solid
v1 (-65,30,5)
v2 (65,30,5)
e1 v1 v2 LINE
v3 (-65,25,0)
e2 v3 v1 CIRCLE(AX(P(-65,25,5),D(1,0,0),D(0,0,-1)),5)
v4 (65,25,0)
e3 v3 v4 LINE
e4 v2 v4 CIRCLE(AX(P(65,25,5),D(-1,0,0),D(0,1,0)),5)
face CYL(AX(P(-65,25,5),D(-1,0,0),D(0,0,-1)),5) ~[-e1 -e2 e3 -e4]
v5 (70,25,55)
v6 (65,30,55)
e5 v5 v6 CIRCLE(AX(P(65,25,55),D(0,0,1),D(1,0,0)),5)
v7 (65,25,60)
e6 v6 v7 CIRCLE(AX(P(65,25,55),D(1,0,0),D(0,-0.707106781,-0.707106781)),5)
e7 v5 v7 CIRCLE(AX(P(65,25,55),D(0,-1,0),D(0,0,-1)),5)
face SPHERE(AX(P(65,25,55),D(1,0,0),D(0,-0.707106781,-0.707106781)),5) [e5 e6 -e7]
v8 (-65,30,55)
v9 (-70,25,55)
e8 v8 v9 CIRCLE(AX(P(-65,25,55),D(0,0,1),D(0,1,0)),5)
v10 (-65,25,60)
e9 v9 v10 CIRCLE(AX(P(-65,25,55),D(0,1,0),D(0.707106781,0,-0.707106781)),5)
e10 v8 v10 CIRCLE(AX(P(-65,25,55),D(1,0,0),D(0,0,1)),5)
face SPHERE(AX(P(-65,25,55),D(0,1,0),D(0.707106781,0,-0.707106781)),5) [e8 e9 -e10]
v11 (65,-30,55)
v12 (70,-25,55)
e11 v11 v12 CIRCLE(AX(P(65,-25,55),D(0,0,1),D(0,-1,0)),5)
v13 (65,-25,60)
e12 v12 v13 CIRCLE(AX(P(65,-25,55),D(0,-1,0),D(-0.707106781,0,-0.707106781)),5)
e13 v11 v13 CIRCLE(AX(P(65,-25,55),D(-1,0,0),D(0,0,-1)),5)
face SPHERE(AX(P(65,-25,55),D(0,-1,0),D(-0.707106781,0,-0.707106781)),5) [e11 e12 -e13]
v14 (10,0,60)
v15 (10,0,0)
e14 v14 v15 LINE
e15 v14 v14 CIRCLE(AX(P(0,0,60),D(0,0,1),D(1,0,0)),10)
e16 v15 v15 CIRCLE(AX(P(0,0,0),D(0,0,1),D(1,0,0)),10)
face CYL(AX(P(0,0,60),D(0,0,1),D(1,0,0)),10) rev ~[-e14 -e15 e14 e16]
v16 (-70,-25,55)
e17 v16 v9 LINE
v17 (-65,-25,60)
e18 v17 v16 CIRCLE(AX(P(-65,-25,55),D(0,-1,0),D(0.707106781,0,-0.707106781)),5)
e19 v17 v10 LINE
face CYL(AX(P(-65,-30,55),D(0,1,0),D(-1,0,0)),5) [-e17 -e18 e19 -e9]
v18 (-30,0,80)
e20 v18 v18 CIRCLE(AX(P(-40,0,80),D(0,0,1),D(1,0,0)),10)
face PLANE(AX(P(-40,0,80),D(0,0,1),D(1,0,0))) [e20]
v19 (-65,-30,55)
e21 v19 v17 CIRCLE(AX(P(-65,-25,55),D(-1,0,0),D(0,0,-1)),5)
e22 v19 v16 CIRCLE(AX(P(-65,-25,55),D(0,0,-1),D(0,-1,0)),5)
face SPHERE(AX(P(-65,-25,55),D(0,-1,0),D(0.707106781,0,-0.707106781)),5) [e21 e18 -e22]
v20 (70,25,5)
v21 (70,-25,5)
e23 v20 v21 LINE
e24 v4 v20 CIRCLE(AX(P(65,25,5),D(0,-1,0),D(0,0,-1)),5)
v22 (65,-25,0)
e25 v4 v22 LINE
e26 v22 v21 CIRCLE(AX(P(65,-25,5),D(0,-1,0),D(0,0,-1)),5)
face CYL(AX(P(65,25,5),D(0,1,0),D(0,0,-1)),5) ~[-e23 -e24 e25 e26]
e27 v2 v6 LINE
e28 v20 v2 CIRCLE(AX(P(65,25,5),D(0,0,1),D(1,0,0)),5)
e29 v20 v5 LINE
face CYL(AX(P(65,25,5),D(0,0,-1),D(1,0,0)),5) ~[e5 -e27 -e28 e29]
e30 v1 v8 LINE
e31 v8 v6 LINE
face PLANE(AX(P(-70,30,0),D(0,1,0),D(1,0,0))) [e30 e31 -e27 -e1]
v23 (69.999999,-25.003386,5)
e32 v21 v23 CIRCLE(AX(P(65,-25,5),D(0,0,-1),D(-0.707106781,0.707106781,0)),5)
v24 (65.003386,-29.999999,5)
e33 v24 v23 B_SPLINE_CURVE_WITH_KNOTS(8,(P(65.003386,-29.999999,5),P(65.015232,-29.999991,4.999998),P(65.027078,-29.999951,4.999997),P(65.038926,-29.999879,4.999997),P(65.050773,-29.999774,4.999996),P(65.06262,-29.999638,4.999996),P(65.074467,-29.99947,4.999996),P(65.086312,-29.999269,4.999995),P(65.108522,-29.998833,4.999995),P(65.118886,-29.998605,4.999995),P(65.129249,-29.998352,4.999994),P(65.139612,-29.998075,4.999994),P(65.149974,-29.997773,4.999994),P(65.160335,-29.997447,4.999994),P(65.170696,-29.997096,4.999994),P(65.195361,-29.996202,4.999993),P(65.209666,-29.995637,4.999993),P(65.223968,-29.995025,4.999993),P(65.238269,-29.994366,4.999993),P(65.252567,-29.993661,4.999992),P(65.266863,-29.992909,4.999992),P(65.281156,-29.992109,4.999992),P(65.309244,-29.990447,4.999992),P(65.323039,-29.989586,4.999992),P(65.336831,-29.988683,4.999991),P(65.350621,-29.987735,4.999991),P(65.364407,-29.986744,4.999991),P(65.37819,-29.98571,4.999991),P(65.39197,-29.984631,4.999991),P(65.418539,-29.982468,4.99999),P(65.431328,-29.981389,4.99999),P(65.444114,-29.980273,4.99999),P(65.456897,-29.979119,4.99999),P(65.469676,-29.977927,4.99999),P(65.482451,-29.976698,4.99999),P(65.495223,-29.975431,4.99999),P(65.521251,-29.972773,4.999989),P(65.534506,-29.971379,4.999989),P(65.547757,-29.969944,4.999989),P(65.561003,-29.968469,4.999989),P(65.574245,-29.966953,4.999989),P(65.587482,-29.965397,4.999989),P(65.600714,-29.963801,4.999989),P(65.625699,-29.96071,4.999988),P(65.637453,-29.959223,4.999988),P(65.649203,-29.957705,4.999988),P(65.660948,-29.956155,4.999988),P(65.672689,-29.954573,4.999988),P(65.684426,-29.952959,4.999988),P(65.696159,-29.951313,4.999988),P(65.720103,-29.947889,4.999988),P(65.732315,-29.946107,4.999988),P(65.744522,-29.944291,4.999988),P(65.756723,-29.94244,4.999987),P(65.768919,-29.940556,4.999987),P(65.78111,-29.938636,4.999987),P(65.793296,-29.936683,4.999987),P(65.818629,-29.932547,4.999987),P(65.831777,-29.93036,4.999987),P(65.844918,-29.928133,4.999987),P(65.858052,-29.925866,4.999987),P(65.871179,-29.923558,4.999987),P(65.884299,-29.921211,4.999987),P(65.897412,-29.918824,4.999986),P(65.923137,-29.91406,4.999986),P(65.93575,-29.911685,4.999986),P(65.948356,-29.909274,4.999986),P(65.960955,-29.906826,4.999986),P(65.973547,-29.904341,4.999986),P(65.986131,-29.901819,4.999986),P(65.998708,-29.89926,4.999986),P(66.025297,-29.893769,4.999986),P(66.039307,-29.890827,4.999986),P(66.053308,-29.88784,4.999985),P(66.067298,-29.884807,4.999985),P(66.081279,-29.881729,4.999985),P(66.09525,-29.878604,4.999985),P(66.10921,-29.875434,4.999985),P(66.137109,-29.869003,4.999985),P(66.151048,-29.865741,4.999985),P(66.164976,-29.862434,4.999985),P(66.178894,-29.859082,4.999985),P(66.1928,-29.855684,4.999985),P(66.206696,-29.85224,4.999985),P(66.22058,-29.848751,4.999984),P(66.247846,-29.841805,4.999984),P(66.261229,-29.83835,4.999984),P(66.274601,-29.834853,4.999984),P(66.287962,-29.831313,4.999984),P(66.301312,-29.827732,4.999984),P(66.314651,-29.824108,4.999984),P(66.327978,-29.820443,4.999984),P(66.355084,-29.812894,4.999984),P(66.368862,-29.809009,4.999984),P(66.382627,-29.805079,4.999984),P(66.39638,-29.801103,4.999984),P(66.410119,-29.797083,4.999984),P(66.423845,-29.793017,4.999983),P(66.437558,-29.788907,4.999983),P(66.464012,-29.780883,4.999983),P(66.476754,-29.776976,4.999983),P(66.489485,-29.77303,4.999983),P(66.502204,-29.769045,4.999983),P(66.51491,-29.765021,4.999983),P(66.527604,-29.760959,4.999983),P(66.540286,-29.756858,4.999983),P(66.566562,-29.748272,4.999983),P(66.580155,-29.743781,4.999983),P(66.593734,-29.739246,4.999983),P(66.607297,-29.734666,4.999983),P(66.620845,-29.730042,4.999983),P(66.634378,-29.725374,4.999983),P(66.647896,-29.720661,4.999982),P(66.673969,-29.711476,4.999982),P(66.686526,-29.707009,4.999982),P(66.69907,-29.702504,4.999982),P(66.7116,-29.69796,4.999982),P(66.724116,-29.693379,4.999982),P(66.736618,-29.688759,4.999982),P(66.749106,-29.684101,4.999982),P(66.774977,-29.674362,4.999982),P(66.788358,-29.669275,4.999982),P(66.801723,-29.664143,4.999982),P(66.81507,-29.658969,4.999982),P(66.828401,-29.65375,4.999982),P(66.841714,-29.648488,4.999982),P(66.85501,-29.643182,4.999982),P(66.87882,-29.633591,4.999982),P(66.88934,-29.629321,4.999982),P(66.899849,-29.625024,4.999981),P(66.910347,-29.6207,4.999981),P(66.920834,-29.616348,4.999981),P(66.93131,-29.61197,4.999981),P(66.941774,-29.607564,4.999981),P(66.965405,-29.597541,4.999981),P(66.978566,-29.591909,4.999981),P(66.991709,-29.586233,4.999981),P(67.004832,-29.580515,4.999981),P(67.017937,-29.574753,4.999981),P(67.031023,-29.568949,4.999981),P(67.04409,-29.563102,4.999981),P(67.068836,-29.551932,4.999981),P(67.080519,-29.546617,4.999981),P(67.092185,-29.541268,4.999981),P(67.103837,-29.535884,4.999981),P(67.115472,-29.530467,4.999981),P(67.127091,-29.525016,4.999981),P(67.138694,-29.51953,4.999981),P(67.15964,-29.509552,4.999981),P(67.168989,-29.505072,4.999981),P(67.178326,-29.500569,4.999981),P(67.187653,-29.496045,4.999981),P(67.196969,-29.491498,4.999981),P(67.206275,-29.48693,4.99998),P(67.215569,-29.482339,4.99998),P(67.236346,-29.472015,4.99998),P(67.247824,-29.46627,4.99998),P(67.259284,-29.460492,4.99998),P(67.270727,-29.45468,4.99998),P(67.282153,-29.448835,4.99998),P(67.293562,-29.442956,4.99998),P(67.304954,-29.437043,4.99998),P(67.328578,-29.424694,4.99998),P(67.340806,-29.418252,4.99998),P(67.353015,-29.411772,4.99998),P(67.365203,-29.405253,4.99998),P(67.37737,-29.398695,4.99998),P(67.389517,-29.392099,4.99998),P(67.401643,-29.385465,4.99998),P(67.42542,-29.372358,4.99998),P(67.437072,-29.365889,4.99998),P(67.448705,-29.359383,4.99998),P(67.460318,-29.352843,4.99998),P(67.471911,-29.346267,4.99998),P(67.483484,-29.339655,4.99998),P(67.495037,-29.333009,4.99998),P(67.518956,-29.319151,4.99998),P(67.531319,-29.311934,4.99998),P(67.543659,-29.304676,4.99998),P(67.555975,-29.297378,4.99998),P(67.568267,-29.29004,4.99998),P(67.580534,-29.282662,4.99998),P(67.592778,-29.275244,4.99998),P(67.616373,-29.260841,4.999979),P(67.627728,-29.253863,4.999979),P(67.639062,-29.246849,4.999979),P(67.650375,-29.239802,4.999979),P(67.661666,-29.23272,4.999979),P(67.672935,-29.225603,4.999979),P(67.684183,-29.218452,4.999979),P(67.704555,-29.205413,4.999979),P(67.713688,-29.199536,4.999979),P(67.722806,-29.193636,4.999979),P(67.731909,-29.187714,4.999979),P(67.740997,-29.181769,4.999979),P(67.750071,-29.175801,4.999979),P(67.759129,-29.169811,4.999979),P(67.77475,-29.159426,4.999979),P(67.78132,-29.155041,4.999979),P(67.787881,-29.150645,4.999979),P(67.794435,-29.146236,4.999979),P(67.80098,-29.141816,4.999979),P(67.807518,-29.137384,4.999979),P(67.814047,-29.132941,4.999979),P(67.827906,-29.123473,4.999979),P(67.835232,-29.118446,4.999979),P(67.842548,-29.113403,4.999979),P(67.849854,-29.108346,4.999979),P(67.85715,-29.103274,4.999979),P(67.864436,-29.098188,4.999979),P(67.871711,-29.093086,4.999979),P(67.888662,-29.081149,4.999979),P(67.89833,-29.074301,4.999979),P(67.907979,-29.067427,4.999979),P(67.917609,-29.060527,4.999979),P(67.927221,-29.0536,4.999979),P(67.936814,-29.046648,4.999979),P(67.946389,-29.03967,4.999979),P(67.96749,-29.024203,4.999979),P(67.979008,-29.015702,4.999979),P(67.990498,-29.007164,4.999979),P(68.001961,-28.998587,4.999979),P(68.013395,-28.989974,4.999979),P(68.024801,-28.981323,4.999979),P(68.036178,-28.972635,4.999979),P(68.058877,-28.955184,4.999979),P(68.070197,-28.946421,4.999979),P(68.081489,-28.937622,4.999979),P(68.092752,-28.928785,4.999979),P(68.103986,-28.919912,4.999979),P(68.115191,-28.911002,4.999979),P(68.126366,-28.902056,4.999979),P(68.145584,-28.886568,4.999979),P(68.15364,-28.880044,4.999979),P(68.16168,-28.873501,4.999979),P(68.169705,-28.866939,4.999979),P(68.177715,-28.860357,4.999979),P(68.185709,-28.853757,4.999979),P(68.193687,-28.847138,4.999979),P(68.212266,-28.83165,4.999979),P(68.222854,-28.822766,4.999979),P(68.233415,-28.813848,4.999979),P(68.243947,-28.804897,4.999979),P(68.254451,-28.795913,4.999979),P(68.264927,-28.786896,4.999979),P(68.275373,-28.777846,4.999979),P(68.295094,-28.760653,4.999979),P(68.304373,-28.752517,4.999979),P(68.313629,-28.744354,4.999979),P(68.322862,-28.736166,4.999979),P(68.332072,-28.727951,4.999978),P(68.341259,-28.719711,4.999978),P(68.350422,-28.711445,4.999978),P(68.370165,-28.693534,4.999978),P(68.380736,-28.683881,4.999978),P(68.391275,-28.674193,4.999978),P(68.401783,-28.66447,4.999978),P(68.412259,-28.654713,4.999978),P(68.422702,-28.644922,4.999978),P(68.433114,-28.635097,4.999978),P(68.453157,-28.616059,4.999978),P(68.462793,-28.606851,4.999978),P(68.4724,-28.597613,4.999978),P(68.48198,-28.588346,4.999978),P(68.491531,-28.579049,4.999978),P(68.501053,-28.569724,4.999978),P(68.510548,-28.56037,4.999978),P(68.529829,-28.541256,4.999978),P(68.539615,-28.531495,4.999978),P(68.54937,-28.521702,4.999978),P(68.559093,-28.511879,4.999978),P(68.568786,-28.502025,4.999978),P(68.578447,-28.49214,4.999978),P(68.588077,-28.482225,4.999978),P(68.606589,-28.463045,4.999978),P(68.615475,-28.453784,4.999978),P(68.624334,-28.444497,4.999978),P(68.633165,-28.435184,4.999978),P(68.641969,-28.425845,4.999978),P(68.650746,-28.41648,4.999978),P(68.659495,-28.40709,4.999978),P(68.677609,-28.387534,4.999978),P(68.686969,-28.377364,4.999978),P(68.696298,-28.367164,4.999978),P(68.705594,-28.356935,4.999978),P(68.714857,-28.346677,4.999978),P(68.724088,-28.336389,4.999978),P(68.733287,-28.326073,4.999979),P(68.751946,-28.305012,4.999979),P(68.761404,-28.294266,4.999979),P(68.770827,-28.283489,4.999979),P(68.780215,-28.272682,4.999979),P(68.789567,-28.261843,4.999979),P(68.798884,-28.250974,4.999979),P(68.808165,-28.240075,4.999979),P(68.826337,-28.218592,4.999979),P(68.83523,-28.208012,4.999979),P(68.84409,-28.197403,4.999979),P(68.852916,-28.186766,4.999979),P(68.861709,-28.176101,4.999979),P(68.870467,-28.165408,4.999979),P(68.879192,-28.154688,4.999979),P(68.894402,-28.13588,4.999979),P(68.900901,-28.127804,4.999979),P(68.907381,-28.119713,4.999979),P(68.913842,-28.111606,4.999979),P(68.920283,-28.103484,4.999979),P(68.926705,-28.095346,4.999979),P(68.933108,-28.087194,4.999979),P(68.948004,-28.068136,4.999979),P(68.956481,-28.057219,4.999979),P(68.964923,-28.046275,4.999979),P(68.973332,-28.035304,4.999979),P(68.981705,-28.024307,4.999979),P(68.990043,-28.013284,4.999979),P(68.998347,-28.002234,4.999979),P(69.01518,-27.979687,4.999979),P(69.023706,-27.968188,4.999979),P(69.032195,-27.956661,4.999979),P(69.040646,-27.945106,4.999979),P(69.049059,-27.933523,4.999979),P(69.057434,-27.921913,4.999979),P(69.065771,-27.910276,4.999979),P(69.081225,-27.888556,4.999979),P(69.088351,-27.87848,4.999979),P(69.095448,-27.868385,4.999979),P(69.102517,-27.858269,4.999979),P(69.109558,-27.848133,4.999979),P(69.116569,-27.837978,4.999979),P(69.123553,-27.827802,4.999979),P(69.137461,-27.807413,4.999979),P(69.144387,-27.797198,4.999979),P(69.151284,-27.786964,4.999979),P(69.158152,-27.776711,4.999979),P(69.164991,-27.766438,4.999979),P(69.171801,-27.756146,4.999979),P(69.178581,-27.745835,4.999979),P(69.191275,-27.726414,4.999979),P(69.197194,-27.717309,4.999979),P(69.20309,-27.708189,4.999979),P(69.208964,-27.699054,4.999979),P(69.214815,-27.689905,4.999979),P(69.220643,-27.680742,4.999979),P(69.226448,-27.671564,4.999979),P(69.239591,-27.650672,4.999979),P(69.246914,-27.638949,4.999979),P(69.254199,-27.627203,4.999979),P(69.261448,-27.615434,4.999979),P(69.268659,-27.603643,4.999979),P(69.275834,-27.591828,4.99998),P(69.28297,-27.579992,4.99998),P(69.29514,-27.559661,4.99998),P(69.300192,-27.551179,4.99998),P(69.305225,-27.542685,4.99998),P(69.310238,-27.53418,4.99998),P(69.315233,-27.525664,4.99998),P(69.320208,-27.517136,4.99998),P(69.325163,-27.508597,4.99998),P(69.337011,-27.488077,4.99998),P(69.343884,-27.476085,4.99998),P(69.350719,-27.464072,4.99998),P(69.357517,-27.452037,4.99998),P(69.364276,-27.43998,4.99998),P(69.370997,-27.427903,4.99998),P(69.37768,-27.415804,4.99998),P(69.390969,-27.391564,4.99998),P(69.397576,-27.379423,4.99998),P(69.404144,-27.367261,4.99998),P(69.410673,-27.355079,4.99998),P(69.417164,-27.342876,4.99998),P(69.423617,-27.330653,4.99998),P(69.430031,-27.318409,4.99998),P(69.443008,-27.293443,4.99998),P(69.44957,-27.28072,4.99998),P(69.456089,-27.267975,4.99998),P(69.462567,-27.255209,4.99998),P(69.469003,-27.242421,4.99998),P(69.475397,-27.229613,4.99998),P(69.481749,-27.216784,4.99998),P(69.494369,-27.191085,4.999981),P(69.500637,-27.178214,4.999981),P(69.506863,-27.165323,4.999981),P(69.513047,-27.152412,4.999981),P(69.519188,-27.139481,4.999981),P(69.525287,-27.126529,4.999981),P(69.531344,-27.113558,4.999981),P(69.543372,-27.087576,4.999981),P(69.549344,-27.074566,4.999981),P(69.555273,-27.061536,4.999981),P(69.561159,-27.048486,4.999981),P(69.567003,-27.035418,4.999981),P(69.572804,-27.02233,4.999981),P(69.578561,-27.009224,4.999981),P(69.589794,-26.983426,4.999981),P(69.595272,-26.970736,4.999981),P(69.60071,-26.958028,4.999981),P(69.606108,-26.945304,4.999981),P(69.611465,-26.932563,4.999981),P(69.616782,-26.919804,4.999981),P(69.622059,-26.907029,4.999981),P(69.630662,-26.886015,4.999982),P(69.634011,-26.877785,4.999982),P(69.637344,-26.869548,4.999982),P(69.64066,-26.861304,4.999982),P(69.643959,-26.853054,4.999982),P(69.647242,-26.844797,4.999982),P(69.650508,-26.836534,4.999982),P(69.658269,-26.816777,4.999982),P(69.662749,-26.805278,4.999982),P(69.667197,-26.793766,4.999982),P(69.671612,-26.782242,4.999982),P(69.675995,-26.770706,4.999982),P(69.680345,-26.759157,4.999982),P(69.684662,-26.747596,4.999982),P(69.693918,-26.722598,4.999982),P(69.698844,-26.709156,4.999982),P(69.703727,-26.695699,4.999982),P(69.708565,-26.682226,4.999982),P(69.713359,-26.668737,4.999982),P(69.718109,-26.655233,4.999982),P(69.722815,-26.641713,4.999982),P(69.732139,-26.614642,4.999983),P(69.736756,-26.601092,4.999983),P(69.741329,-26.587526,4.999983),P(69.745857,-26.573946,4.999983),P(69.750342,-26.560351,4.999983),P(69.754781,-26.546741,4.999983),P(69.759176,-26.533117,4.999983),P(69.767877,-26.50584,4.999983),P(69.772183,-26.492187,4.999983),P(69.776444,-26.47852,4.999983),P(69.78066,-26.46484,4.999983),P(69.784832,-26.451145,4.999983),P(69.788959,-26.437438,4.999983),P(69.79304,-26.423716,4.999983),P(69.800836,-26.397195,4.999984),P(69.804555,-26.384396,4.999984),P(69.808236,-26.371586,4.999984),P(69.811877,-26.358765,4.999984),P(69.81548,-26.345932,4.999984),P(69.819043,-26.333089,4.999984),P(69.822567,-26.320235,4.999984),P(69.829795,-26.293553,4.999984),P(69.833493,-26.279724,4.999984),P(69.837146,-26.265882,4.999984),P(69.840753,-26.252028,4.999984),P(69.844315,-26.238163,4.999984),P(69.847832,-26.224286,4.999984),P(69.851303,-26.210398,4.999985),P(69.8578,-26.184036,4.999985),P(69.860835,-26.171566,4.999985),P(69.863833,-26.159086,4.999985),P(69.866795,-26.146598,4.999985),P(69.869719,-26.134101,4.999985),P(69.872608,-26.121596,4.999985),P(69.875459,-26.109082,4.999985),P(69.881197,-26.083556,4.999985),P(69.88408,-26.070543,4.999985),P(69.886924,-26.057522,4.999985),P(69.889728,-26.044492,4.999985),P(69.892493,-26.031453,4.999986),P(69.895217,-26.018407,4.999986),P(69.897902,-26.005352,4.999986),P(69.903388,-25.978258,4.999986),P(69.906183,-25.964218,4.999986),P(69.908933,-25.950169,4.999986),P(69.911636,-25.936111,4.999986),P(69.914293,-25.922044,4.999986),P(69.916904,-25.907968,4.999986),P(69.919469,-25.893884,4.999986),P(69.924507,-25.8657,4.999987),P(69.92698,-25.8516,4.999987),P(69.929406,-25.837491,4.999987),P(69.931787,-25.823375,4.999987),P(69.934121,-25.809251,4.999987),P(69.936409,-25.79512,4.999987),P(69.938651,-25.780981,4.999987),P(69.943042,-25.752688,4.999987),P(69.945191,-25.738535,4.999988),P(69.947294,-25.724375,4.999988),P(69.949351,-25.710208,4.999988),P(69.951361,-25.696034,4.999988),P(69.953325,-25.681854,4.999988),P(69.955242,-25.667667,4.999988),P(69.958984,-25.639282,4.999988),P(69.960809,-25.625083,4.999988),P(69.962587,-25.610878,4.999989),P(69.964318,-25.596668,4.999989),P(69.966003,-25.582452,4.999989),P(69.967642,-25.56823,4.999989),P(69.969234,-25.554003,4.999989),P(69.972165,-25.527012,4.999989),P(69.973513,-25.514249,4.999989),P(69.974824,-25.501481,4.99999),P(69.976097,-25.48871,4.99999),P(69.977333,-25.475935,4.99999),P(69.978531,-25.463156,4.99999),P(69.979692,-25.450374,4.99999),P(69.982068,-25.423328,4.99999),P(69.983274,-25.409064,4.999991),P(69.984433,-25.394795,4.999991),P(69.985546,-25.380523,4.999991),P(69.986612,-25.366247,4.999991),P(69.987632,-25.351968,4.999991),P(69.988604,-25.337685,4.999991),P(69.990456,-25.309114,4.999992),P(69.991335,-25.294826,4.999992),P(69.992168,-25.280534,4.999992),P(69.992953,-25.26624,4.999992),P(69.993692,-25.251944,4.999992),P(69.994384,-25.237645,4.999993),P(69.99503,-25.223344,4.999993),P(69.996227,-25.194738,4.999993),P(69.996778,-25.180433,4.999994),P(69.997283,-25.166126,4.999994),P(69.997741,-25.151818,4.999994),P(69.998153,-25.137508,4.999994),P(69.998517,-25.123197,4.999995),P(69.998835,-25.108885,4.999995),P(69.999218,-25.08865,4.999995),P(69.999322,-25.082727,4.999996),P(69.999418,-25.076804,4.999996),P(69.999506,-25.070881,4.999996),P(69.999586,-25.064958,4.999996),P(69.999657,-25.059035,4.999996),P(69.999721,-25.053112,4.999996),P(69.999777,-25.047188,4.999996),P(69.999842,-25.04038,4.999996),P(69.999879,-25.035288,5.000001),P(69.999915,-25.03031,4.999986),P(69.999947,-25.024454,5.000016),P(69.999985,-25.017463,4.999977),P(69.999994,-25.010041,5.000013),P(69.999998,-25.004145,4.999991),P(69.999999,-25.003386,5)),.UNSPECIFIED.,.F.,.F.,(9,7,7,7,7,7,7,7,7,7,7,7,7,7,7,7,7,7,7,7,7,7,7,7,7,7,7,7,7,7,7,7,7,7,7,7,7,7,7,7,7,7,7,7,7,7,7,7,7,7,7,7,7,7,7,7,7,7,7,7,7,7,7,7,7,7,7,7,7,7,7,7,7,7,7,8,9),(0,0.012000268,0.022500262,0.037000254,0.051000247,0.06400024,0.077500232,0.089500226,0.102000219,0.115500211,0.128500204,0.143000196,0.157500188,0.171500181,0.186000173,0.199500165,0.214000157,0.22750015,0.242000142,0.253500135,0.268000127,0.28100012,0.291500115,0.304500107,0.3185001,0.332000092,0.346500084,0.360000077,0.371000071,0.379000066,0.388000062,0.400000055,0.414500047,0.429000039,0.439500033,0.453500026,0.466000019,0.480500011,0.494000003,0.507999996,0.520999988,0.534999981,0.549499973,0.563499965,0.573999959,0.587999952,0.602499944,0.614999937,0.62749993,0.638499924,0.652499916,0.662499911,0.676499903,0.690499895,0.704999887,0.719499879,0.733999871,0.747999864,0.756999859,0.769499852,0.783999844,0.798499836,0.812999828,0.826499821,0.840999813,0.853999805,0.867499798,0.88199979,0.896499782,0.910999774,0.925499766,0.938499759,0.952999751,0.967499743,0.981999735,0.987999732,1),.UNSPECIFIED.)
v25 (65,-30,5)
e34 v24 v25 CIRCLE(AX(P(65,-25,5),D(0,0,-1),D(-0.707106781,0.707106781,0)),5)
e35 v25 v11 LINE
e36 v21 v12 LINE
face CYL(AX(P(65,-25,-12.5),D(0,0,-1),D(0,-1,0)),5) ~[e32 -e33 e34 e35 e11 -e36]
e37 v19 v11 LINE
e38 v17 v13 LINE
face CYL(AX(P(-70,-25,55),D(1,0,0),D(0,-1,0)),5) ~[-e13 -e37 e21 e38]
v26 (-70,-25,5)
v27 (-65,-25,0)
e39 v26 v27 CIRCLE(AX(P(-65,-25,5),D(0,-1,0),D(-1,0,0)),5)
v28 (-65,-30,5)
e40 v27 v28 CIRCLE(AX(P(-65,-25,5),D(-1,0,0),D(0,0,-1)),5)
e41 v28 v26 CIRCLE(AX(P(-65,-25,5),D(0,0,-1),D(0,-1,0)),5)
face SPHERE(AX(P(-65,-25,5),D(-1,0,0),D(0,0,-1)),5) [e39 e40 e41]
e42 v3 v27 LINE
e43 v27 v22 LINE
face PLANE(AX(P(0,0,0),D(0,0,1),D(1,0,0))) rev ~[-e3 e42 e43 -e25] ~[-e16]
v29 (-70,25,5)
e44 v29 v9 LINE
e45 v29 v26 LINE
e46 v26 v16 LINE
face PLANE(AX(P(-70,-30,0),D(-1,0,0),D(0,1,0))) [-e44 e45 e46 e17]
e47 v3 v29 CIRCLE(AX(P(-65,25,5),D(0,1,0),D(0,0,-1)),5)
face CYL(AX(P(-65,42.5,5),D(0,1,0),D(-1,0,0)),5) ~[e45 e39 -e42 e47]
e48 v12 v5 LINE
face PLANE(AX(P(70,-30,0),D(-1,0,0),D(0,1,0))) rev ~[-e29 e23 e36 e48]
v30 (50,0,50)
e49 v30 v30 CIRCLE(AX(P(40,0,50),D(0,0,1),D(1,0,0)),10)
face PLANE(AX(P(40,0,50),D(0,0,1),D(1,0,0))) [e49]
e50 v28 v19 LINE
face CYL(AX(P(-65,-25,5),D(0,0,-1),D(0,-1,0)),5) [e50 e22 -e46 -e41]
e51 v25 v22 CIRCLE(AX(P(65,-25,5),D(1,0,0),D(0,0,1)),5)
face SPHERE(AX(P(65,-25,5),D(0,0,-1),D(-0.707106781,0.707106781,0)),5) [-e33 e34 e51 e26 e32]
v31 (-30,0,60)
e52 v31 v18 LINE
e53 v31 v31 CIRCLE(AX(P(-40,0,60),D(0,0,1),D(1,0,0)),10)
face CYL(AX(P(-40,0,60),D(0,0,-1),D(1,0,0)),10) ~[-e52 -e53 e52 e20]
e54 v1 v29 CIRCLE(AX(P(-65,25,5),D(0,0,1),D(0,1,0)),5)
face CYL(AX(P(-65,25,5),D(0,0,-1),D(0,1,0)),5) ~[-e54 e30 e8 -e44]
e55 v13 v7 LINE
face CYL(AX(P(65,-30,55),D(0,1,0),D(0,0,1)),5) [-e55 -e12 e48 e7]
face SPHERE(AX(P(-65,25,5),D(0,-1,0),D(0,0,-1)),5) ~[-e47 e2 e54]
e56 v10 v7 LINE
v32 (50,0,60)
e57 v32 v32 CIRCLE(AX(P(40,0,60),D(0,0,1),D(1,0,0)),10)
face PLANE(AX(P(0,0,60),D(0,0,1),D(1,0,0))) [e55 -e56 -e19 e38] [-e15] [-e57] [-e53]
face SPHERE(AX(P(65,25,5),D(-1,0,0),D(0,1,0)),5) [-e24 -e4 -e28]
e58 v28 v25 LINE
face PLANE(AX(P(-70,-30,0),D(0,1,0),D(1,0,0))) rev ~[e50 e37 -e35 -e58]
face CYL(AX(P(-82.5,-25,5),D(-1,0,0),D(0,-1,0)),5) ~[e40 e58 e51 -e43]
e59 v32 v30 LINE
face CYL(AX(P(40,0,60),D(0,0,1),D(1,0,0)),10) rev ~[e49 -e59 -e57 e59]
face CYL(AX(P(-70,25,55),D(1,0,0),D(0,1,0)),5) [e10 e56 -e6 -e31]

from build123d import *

# Parameters (mm, degrees)
F0_W          = 140
F0_H          = 60
F1_DEPTH      = 60
F2_R          = 10
F5_DEPTH      = 20
F4_R          = 10
F6_DEPTH      = 71.6
F3_R          = 10
F7_DEPTH      = 10
F8_R          = 5
F9_T1_DEPTH   = 165
F9_T3_DEPTH   = 67.5
F9_S7_W       = 5
F9_S7_H       = 5
F9_T8_DEPTH   = 5
F10_T1_DEPTH  = 50
F10_T3_DEPTH  = 67.5
F10_S7_W      = 5
F10_S7_H      = 5
F10_T8_DEPTH  = 5
F10_T12_ANGLE = 89.9999999974
F11_T1_DEPTH  = 147.5
F11_T3_DEPTH  = 50
F11_S7_W      = 5
F11_S7_H      = 5
F11_T8_DEPTH  = 5
F11_T12_ANGLE = 89.9999999974
F12_T1_DEPTH  = 50
F12_T3_DEPTH  = 50
F12_S7_W      = 5
F12_S7_H      = 5
F12_T8_DEPTH  = 5
F12_S13_W     = 5
F12_S13_H     = 5
F12_T14_DEPTH = 5
F12_T18_ANGLE = 89.9999999974


# Not quite as in the source:
# - a fillet or chamfer that OpenCascade refuses, or shapes differently, is made with other operations: its cross-section is extruded or revolved along the edge and cut away or added


with BuildPart() as f1:
    # F0 (on Top) → F1 (new body)
    with BuildSketch(Plane.XY):
        Rectangle(F0_W, F0_H)
    extrude(amount=F1_DEPTH)

    # F2 (on face) → F5 (join)
    with BuildSketch(Plane.XY.offset(60)):
        with Locations((-40, 0)):
            Circle(F2_R)
    extrude(amount=F5_DEPTH)

    # F4 (on face) → F6 (cut)
    with BuildSketch(Plane.XY.offset(60)):
        Circle(F4_R)
    extrude(amount=-F6_DEPTH, mode=Mode.SUBTRACT)

    # F3 (on face) → F7 (cut)
    with BuildSketch(Plane.XY.offset(60)):
        with Locations((40, 0)):
            Circle(F3_R)
    extrude(amount=-F7_DEPTH, mode=Mode.SUBTRACT)

    # F8
    f8_edges = [f1.edges().sort_by_distance(p)[0] for p in [
        (0, 30, 60),
        (-70, 0, 60),
        (0, -30, 60),
        (70, 0, 60),
    ]]
    fillet(f8_edges, radius=F8_R)

    # F9: fillet of radius 5 on 2 edges, made by hand

    # F9_s2 → F9_t1 (cut)
    with BuildSketch(Plane.YZ.offset(-82.5)):
        with BuildLine():
            ThreePointArc((-30, 5), (-28.5355339059, 1.4644660941), (-25, 0))
            Line((-25, 0), (-30, 0))
            Line((-30, 0), (-30, 5))
        make_face()
    extrude(amount=F9_T1_DEPTH, mode=Mode.SUBTRACT)

    # F9_s4 → F9_t3 (cut)
    with BuildSketch(Plane.XY.offset(-12.5)):
        with BuildLine():
            ThreePointArc((65, -30), (68.5355339059, -28.5355339059), (70, -25))
            Line((70, -25), (70, -30))
            Line((70, -30), (65, -30))
        make_face()
    extrude(amount=F9_T3_DEPTH, mode=Mode.SUBTRACT)


with BuildPart() as f9_tool6:
    # F9_s7 → F9_t8 (new body)
    with BuildSketch(Plane.XZ.offset(25)):
        with Locations((67.5, 57.5)):
            Rectangle(F9_S7_W, F9_S7_H)
    extrude(amount=F9_T8_DEPTH)

    # F9_s9 → F9_t10 (revolve, cut)
    with BuildSketch(Plane(origin=(65, -25, 55), x_dir=(-0.7071067812, 0, -0.7071067812), z_dir=(-0.7071067812, 0, 0.7071067812))):
        with BuildLine():
            ThreePointArc((0, -5), (5, 0), (0, 5))
            Line((0, 5), (0, -5))
        make_face()
    revolve(axis=Axis((65, -25, 55), (0, -1, 0)), mode=Mode.SUBTRACT)


with BuildPart() as f1_1:
    add(f1.part)

    # F9_t5: cut F9_tool6
    add(f9_tool6.part, mode=Mode.SUBTRACT)

    # F10: fillet of radius 5 on 1 edges, made by hand

    # F10_s2 → F10_t1 (cut)
    with BuildSketch(Plane.XY.offset(5)):
        with BuildLine():
            ThreePointArc((-65, -30), (-68.5355339059, -28.5355339059), (-70, -25))
            Line((-70, -25), (-70, -30))
            Line((-70, -30), (-65, -30))
        make_face()
    extrude(amount=F10_T1_DEPTH, mode=Mode.SUBTRACT)

    # F10_s4 → F10_t3 (cut)
    with BuildSketch(Plane.XZ.offset(-42.5)):
        with BuildLine():
            ThreePointArc((-70, 5), (-68.5355339059, 1.4644660941), (-65, 0))
            Line((-65, 0), (-70, 0))
            Line((-70, 0), (-70, 5))
        make_face()
    extrude(amount=F10_T3_DEPTH, mode=Mode.SUBTRACT)


with BuildPart() as f10_tool6:
    # F10_s7 → F10_t8 (new body)
    with BuildSketch(Plane.XZ.offset(25)):
        with Locations((-67.5, 57.5)):
            Rectangle(F10_S7_W, F10_S7_H)
    extrude(amount=F10_T8_DEPTH)

    # F10_s9 → F10_t10 (revolve, cut)
    with BuildSketch(Plane(origin=(-65, -25, 55), x_dir=(0.7071067812, 0, -0.7071067812), z_dir=(-0.7071067812, 0, -0.7071067812))):
        with BuildLine():
            ThreePointArc((0, -5), (5, 0), (0, 5))
            Line((0, 5), (0, -5))
        make_face()
    revolve(axis=Axis((-65, -25, 55), (0, -1, 0)), mode=Mode.SUBTRACT)


with BuildPart() as f1_2:
    add(f1_1.part)

    # F10_t5: cut F10_tool6
    add(f10_tool6.part, mode=Mode.SUBTRACT)

    # F10_s11 → F10_t12 (revolve, cut)
    with BuildSketch(Plane.XZ.offset(24.9999999999)):
        with BuildLine():
            ThreePointArc((-65, 0), (-68.5355339059, 1.4644660941), (-70, 5))
            Line((-70, 5), (-70, 0))
            Line((-70, 0), (-65, 0))
        make_face()
    revolve(axis=Axis((-70, -24.9999999999, 5.0000000001), (-1, 0, 0)), revolution_arc=F10_T12_ANGLE, mode=Mode.SUBTRACT)

    # F11: fillet of radius 5 on 1 edges, made by hand

    # F11_s2 → F11_t1 (cut)
    with BuildSketch(Plane.YZ.offset(-65)):
        with BuildLine():
            ThreePointArc((25, 0), (28.5355339059, 1.4644660941), (30, 5))
            Line((30, 5), (30, 0))
            Line((30, 0), (25, 0))
        make_face()
    extrude(amount=F11_T1_DEPTH, mode=Mode.SUBTRACT)

    # F11_s4 → F11_t3 (cut)
    with BuildSketch(Plane.XY.offset(5)):
        with BuildLine():
            ThreePointArc((-65, 30), (-68.5355339059, 28.5355339059), (-70, 25))
            Line((-70, 25), (-70, 30))
            Line((-70, 30), (-65, 30))
        make_face()
    extrude(amount=F11_T3_DEPTH, mode=Mode.SUBTRACT)


with BuildPart() as f11_tool6:
    # F11_s7 → F11_t8 (new body)
    with BuildSketch(Plane.XZ.offset(-25)):
        with Locations((-67.5, 57.5)):
            Rectangle(F11_S7_W, F11_S7_H)
    extrude(amount=-F11_T8_DEPTH)

    # F11_s9 → F11_t10 (revolve, cut)
    with BuildSketch(Plane(origin=(-65, 25, 55), x_dir=(0.7071067812, 0, -0.7071067812), z_dir=(0.7071067812, 0, 0.7071067812))):
        with BuildLine():
            ThreePointArc((0, -5), (5, 0), (0, 5))
            Line((0, 5), (0, -5))
        make_face()
    revolve(axis=Axis((-65, 25, 55), (0, 1, 0)), mode=Mode.SUBTRACT)


with BuildPart() as f1_3:
    add(f1_2.part)

    # F11_t5: cut F11_tool6
    add(f11_tool6.part, mode=Mode.SUBTRACT)

    # F11_s11 → F11_t12 (revolve, cut)
    with BuildSketch(Plane.YZ.offset(-64.9999999999)):
        with BuildLine():
            ThreePointArc((30, 5), (28.5355339059, 1.4644660941), (25, 0))
            Line((25, 0), (30, 0))
            Line((30, 0), (30, 5))
        make_face()
    revolve(axis=Axis((-64.9999999999, 30, 5.0000000001), (0, 1, 0)), revolution_arc=F11_T12_ANGLE, mode=Mode.SUBTRACT)

    # F12: fillet of radius 5 on 1 edges, made by hand

    # F12_s2 → F12_t1 (cut)
    with BuildSketch(Plane.XY.offset(5)):
        with BuildLine():
            ThreePointArc((70, 25), (68.5355339059, 28.5355339059), (65, 30))
            Line((65, 30), (70, 30))
            Line((70, 30), (70, 25))
        make_face()
    extrude(amount=F12_T1_DEPTH, mode=Mode.SUBTRACT)

    # F12_s4 → F12_t3 (cut)
    with BuildSketch(Plane.XZ.offset(-25)):
        with BuildLine():
            ThreePointArc((65, 0), (68.5355339059, 1.4644660941), (70, 5))
            Line((70, 5), (70, 0))
            Line((70, 0), (65, 0))
        make_face()
    extrude(amount=F12_T3_DEPTH, mode=Mode.SUBTRACT)


with BuildPart() as f12_tool6:
    # F12_s7 → F12_t8 (new body)
    with BuildSketch(Plane.YZ.offset(65)):
        with Locations((27.5, 57.5)):
            Rectangle(F12_S7_W, F12_S7_H)
    extrude(amount=F12_T8_DEPTH)

    # F12_s9 → F12_t10 (revolve, cut)
    with BuildSketch(Plane(origin=(65, 25, 55), x_dir=(0, -0.7071067812, -0.7071067812), z_dir=(0, -0.7071067812, 0.7071067812))):
        with BuildLine():
            ThreePointArc((0, -5), (5, 0), (0, 5))
            Line((0, 5), (0, -5))
        make_face()
    revolve(axis=Axis((65, 25, 55), (1, 0, 0)), mode=Mode.SUBTRACT)


with BuildPart() as f1_4:
    add(f1_3.part)

    # F12_t5: cut F12_tool6
    add(f12_tool6.part, mode=Mode.SUBTRACT)


with BuildPart() as f12_tool12:
    # F12_s13 → F12_t14 (new body)
    with BuildSketch(Plane.XY.offset(5)):
        with Locations((67.5, -27.5)):
            Rectangle(F12_S13_W, F12_S13_H)
    extrude(amount=-F12_T14_DEPTH)

    # F12_s15 → F12_t16 (revolve, cut)
    with BuildSketch(Plane(origin=(65, -25, 5), x_dir=(-0.7071067812, 0.7071067812, 0), z_dir=(-0.7071067812, -0.7071067812, 0))):
        with BuildLine():
            ThreePointArc((0, -5), (5, 0), (0, 5))
            Line((0, 5), (0, -5))
        make_face()
    revolve(axis=Axis((65, -25, 5), (0, 0, -1)), mode=Mode.SUBTRACT)


with BuildPart() as f1_5:
    add(f1_4.part)

    # F12_t11: cut F12_tool12
    add(f12_tool12.part, mode=Mode.SUBTRACT)

    # F12_s17 → F12_t18 (revolve, cut)
    with BuildSketch(Plane.XY.offset(5.0000000001)):
        with BuildLine():
            ThreePointArc((70, 25), (68.5355339059, 28.5355339059), (65, 30))
            Line((65, 30), (70, 30))
            Line((70, 30), (70, 25))
        make_face()
    revolve(axis=Axis((70, 24.9999999999, 5.0000000001), (-1, 0, 0)), revolution_arc=F12_T18_ANGLE, mode=Mode.SUBTRACT)


solid = f1_5.part
